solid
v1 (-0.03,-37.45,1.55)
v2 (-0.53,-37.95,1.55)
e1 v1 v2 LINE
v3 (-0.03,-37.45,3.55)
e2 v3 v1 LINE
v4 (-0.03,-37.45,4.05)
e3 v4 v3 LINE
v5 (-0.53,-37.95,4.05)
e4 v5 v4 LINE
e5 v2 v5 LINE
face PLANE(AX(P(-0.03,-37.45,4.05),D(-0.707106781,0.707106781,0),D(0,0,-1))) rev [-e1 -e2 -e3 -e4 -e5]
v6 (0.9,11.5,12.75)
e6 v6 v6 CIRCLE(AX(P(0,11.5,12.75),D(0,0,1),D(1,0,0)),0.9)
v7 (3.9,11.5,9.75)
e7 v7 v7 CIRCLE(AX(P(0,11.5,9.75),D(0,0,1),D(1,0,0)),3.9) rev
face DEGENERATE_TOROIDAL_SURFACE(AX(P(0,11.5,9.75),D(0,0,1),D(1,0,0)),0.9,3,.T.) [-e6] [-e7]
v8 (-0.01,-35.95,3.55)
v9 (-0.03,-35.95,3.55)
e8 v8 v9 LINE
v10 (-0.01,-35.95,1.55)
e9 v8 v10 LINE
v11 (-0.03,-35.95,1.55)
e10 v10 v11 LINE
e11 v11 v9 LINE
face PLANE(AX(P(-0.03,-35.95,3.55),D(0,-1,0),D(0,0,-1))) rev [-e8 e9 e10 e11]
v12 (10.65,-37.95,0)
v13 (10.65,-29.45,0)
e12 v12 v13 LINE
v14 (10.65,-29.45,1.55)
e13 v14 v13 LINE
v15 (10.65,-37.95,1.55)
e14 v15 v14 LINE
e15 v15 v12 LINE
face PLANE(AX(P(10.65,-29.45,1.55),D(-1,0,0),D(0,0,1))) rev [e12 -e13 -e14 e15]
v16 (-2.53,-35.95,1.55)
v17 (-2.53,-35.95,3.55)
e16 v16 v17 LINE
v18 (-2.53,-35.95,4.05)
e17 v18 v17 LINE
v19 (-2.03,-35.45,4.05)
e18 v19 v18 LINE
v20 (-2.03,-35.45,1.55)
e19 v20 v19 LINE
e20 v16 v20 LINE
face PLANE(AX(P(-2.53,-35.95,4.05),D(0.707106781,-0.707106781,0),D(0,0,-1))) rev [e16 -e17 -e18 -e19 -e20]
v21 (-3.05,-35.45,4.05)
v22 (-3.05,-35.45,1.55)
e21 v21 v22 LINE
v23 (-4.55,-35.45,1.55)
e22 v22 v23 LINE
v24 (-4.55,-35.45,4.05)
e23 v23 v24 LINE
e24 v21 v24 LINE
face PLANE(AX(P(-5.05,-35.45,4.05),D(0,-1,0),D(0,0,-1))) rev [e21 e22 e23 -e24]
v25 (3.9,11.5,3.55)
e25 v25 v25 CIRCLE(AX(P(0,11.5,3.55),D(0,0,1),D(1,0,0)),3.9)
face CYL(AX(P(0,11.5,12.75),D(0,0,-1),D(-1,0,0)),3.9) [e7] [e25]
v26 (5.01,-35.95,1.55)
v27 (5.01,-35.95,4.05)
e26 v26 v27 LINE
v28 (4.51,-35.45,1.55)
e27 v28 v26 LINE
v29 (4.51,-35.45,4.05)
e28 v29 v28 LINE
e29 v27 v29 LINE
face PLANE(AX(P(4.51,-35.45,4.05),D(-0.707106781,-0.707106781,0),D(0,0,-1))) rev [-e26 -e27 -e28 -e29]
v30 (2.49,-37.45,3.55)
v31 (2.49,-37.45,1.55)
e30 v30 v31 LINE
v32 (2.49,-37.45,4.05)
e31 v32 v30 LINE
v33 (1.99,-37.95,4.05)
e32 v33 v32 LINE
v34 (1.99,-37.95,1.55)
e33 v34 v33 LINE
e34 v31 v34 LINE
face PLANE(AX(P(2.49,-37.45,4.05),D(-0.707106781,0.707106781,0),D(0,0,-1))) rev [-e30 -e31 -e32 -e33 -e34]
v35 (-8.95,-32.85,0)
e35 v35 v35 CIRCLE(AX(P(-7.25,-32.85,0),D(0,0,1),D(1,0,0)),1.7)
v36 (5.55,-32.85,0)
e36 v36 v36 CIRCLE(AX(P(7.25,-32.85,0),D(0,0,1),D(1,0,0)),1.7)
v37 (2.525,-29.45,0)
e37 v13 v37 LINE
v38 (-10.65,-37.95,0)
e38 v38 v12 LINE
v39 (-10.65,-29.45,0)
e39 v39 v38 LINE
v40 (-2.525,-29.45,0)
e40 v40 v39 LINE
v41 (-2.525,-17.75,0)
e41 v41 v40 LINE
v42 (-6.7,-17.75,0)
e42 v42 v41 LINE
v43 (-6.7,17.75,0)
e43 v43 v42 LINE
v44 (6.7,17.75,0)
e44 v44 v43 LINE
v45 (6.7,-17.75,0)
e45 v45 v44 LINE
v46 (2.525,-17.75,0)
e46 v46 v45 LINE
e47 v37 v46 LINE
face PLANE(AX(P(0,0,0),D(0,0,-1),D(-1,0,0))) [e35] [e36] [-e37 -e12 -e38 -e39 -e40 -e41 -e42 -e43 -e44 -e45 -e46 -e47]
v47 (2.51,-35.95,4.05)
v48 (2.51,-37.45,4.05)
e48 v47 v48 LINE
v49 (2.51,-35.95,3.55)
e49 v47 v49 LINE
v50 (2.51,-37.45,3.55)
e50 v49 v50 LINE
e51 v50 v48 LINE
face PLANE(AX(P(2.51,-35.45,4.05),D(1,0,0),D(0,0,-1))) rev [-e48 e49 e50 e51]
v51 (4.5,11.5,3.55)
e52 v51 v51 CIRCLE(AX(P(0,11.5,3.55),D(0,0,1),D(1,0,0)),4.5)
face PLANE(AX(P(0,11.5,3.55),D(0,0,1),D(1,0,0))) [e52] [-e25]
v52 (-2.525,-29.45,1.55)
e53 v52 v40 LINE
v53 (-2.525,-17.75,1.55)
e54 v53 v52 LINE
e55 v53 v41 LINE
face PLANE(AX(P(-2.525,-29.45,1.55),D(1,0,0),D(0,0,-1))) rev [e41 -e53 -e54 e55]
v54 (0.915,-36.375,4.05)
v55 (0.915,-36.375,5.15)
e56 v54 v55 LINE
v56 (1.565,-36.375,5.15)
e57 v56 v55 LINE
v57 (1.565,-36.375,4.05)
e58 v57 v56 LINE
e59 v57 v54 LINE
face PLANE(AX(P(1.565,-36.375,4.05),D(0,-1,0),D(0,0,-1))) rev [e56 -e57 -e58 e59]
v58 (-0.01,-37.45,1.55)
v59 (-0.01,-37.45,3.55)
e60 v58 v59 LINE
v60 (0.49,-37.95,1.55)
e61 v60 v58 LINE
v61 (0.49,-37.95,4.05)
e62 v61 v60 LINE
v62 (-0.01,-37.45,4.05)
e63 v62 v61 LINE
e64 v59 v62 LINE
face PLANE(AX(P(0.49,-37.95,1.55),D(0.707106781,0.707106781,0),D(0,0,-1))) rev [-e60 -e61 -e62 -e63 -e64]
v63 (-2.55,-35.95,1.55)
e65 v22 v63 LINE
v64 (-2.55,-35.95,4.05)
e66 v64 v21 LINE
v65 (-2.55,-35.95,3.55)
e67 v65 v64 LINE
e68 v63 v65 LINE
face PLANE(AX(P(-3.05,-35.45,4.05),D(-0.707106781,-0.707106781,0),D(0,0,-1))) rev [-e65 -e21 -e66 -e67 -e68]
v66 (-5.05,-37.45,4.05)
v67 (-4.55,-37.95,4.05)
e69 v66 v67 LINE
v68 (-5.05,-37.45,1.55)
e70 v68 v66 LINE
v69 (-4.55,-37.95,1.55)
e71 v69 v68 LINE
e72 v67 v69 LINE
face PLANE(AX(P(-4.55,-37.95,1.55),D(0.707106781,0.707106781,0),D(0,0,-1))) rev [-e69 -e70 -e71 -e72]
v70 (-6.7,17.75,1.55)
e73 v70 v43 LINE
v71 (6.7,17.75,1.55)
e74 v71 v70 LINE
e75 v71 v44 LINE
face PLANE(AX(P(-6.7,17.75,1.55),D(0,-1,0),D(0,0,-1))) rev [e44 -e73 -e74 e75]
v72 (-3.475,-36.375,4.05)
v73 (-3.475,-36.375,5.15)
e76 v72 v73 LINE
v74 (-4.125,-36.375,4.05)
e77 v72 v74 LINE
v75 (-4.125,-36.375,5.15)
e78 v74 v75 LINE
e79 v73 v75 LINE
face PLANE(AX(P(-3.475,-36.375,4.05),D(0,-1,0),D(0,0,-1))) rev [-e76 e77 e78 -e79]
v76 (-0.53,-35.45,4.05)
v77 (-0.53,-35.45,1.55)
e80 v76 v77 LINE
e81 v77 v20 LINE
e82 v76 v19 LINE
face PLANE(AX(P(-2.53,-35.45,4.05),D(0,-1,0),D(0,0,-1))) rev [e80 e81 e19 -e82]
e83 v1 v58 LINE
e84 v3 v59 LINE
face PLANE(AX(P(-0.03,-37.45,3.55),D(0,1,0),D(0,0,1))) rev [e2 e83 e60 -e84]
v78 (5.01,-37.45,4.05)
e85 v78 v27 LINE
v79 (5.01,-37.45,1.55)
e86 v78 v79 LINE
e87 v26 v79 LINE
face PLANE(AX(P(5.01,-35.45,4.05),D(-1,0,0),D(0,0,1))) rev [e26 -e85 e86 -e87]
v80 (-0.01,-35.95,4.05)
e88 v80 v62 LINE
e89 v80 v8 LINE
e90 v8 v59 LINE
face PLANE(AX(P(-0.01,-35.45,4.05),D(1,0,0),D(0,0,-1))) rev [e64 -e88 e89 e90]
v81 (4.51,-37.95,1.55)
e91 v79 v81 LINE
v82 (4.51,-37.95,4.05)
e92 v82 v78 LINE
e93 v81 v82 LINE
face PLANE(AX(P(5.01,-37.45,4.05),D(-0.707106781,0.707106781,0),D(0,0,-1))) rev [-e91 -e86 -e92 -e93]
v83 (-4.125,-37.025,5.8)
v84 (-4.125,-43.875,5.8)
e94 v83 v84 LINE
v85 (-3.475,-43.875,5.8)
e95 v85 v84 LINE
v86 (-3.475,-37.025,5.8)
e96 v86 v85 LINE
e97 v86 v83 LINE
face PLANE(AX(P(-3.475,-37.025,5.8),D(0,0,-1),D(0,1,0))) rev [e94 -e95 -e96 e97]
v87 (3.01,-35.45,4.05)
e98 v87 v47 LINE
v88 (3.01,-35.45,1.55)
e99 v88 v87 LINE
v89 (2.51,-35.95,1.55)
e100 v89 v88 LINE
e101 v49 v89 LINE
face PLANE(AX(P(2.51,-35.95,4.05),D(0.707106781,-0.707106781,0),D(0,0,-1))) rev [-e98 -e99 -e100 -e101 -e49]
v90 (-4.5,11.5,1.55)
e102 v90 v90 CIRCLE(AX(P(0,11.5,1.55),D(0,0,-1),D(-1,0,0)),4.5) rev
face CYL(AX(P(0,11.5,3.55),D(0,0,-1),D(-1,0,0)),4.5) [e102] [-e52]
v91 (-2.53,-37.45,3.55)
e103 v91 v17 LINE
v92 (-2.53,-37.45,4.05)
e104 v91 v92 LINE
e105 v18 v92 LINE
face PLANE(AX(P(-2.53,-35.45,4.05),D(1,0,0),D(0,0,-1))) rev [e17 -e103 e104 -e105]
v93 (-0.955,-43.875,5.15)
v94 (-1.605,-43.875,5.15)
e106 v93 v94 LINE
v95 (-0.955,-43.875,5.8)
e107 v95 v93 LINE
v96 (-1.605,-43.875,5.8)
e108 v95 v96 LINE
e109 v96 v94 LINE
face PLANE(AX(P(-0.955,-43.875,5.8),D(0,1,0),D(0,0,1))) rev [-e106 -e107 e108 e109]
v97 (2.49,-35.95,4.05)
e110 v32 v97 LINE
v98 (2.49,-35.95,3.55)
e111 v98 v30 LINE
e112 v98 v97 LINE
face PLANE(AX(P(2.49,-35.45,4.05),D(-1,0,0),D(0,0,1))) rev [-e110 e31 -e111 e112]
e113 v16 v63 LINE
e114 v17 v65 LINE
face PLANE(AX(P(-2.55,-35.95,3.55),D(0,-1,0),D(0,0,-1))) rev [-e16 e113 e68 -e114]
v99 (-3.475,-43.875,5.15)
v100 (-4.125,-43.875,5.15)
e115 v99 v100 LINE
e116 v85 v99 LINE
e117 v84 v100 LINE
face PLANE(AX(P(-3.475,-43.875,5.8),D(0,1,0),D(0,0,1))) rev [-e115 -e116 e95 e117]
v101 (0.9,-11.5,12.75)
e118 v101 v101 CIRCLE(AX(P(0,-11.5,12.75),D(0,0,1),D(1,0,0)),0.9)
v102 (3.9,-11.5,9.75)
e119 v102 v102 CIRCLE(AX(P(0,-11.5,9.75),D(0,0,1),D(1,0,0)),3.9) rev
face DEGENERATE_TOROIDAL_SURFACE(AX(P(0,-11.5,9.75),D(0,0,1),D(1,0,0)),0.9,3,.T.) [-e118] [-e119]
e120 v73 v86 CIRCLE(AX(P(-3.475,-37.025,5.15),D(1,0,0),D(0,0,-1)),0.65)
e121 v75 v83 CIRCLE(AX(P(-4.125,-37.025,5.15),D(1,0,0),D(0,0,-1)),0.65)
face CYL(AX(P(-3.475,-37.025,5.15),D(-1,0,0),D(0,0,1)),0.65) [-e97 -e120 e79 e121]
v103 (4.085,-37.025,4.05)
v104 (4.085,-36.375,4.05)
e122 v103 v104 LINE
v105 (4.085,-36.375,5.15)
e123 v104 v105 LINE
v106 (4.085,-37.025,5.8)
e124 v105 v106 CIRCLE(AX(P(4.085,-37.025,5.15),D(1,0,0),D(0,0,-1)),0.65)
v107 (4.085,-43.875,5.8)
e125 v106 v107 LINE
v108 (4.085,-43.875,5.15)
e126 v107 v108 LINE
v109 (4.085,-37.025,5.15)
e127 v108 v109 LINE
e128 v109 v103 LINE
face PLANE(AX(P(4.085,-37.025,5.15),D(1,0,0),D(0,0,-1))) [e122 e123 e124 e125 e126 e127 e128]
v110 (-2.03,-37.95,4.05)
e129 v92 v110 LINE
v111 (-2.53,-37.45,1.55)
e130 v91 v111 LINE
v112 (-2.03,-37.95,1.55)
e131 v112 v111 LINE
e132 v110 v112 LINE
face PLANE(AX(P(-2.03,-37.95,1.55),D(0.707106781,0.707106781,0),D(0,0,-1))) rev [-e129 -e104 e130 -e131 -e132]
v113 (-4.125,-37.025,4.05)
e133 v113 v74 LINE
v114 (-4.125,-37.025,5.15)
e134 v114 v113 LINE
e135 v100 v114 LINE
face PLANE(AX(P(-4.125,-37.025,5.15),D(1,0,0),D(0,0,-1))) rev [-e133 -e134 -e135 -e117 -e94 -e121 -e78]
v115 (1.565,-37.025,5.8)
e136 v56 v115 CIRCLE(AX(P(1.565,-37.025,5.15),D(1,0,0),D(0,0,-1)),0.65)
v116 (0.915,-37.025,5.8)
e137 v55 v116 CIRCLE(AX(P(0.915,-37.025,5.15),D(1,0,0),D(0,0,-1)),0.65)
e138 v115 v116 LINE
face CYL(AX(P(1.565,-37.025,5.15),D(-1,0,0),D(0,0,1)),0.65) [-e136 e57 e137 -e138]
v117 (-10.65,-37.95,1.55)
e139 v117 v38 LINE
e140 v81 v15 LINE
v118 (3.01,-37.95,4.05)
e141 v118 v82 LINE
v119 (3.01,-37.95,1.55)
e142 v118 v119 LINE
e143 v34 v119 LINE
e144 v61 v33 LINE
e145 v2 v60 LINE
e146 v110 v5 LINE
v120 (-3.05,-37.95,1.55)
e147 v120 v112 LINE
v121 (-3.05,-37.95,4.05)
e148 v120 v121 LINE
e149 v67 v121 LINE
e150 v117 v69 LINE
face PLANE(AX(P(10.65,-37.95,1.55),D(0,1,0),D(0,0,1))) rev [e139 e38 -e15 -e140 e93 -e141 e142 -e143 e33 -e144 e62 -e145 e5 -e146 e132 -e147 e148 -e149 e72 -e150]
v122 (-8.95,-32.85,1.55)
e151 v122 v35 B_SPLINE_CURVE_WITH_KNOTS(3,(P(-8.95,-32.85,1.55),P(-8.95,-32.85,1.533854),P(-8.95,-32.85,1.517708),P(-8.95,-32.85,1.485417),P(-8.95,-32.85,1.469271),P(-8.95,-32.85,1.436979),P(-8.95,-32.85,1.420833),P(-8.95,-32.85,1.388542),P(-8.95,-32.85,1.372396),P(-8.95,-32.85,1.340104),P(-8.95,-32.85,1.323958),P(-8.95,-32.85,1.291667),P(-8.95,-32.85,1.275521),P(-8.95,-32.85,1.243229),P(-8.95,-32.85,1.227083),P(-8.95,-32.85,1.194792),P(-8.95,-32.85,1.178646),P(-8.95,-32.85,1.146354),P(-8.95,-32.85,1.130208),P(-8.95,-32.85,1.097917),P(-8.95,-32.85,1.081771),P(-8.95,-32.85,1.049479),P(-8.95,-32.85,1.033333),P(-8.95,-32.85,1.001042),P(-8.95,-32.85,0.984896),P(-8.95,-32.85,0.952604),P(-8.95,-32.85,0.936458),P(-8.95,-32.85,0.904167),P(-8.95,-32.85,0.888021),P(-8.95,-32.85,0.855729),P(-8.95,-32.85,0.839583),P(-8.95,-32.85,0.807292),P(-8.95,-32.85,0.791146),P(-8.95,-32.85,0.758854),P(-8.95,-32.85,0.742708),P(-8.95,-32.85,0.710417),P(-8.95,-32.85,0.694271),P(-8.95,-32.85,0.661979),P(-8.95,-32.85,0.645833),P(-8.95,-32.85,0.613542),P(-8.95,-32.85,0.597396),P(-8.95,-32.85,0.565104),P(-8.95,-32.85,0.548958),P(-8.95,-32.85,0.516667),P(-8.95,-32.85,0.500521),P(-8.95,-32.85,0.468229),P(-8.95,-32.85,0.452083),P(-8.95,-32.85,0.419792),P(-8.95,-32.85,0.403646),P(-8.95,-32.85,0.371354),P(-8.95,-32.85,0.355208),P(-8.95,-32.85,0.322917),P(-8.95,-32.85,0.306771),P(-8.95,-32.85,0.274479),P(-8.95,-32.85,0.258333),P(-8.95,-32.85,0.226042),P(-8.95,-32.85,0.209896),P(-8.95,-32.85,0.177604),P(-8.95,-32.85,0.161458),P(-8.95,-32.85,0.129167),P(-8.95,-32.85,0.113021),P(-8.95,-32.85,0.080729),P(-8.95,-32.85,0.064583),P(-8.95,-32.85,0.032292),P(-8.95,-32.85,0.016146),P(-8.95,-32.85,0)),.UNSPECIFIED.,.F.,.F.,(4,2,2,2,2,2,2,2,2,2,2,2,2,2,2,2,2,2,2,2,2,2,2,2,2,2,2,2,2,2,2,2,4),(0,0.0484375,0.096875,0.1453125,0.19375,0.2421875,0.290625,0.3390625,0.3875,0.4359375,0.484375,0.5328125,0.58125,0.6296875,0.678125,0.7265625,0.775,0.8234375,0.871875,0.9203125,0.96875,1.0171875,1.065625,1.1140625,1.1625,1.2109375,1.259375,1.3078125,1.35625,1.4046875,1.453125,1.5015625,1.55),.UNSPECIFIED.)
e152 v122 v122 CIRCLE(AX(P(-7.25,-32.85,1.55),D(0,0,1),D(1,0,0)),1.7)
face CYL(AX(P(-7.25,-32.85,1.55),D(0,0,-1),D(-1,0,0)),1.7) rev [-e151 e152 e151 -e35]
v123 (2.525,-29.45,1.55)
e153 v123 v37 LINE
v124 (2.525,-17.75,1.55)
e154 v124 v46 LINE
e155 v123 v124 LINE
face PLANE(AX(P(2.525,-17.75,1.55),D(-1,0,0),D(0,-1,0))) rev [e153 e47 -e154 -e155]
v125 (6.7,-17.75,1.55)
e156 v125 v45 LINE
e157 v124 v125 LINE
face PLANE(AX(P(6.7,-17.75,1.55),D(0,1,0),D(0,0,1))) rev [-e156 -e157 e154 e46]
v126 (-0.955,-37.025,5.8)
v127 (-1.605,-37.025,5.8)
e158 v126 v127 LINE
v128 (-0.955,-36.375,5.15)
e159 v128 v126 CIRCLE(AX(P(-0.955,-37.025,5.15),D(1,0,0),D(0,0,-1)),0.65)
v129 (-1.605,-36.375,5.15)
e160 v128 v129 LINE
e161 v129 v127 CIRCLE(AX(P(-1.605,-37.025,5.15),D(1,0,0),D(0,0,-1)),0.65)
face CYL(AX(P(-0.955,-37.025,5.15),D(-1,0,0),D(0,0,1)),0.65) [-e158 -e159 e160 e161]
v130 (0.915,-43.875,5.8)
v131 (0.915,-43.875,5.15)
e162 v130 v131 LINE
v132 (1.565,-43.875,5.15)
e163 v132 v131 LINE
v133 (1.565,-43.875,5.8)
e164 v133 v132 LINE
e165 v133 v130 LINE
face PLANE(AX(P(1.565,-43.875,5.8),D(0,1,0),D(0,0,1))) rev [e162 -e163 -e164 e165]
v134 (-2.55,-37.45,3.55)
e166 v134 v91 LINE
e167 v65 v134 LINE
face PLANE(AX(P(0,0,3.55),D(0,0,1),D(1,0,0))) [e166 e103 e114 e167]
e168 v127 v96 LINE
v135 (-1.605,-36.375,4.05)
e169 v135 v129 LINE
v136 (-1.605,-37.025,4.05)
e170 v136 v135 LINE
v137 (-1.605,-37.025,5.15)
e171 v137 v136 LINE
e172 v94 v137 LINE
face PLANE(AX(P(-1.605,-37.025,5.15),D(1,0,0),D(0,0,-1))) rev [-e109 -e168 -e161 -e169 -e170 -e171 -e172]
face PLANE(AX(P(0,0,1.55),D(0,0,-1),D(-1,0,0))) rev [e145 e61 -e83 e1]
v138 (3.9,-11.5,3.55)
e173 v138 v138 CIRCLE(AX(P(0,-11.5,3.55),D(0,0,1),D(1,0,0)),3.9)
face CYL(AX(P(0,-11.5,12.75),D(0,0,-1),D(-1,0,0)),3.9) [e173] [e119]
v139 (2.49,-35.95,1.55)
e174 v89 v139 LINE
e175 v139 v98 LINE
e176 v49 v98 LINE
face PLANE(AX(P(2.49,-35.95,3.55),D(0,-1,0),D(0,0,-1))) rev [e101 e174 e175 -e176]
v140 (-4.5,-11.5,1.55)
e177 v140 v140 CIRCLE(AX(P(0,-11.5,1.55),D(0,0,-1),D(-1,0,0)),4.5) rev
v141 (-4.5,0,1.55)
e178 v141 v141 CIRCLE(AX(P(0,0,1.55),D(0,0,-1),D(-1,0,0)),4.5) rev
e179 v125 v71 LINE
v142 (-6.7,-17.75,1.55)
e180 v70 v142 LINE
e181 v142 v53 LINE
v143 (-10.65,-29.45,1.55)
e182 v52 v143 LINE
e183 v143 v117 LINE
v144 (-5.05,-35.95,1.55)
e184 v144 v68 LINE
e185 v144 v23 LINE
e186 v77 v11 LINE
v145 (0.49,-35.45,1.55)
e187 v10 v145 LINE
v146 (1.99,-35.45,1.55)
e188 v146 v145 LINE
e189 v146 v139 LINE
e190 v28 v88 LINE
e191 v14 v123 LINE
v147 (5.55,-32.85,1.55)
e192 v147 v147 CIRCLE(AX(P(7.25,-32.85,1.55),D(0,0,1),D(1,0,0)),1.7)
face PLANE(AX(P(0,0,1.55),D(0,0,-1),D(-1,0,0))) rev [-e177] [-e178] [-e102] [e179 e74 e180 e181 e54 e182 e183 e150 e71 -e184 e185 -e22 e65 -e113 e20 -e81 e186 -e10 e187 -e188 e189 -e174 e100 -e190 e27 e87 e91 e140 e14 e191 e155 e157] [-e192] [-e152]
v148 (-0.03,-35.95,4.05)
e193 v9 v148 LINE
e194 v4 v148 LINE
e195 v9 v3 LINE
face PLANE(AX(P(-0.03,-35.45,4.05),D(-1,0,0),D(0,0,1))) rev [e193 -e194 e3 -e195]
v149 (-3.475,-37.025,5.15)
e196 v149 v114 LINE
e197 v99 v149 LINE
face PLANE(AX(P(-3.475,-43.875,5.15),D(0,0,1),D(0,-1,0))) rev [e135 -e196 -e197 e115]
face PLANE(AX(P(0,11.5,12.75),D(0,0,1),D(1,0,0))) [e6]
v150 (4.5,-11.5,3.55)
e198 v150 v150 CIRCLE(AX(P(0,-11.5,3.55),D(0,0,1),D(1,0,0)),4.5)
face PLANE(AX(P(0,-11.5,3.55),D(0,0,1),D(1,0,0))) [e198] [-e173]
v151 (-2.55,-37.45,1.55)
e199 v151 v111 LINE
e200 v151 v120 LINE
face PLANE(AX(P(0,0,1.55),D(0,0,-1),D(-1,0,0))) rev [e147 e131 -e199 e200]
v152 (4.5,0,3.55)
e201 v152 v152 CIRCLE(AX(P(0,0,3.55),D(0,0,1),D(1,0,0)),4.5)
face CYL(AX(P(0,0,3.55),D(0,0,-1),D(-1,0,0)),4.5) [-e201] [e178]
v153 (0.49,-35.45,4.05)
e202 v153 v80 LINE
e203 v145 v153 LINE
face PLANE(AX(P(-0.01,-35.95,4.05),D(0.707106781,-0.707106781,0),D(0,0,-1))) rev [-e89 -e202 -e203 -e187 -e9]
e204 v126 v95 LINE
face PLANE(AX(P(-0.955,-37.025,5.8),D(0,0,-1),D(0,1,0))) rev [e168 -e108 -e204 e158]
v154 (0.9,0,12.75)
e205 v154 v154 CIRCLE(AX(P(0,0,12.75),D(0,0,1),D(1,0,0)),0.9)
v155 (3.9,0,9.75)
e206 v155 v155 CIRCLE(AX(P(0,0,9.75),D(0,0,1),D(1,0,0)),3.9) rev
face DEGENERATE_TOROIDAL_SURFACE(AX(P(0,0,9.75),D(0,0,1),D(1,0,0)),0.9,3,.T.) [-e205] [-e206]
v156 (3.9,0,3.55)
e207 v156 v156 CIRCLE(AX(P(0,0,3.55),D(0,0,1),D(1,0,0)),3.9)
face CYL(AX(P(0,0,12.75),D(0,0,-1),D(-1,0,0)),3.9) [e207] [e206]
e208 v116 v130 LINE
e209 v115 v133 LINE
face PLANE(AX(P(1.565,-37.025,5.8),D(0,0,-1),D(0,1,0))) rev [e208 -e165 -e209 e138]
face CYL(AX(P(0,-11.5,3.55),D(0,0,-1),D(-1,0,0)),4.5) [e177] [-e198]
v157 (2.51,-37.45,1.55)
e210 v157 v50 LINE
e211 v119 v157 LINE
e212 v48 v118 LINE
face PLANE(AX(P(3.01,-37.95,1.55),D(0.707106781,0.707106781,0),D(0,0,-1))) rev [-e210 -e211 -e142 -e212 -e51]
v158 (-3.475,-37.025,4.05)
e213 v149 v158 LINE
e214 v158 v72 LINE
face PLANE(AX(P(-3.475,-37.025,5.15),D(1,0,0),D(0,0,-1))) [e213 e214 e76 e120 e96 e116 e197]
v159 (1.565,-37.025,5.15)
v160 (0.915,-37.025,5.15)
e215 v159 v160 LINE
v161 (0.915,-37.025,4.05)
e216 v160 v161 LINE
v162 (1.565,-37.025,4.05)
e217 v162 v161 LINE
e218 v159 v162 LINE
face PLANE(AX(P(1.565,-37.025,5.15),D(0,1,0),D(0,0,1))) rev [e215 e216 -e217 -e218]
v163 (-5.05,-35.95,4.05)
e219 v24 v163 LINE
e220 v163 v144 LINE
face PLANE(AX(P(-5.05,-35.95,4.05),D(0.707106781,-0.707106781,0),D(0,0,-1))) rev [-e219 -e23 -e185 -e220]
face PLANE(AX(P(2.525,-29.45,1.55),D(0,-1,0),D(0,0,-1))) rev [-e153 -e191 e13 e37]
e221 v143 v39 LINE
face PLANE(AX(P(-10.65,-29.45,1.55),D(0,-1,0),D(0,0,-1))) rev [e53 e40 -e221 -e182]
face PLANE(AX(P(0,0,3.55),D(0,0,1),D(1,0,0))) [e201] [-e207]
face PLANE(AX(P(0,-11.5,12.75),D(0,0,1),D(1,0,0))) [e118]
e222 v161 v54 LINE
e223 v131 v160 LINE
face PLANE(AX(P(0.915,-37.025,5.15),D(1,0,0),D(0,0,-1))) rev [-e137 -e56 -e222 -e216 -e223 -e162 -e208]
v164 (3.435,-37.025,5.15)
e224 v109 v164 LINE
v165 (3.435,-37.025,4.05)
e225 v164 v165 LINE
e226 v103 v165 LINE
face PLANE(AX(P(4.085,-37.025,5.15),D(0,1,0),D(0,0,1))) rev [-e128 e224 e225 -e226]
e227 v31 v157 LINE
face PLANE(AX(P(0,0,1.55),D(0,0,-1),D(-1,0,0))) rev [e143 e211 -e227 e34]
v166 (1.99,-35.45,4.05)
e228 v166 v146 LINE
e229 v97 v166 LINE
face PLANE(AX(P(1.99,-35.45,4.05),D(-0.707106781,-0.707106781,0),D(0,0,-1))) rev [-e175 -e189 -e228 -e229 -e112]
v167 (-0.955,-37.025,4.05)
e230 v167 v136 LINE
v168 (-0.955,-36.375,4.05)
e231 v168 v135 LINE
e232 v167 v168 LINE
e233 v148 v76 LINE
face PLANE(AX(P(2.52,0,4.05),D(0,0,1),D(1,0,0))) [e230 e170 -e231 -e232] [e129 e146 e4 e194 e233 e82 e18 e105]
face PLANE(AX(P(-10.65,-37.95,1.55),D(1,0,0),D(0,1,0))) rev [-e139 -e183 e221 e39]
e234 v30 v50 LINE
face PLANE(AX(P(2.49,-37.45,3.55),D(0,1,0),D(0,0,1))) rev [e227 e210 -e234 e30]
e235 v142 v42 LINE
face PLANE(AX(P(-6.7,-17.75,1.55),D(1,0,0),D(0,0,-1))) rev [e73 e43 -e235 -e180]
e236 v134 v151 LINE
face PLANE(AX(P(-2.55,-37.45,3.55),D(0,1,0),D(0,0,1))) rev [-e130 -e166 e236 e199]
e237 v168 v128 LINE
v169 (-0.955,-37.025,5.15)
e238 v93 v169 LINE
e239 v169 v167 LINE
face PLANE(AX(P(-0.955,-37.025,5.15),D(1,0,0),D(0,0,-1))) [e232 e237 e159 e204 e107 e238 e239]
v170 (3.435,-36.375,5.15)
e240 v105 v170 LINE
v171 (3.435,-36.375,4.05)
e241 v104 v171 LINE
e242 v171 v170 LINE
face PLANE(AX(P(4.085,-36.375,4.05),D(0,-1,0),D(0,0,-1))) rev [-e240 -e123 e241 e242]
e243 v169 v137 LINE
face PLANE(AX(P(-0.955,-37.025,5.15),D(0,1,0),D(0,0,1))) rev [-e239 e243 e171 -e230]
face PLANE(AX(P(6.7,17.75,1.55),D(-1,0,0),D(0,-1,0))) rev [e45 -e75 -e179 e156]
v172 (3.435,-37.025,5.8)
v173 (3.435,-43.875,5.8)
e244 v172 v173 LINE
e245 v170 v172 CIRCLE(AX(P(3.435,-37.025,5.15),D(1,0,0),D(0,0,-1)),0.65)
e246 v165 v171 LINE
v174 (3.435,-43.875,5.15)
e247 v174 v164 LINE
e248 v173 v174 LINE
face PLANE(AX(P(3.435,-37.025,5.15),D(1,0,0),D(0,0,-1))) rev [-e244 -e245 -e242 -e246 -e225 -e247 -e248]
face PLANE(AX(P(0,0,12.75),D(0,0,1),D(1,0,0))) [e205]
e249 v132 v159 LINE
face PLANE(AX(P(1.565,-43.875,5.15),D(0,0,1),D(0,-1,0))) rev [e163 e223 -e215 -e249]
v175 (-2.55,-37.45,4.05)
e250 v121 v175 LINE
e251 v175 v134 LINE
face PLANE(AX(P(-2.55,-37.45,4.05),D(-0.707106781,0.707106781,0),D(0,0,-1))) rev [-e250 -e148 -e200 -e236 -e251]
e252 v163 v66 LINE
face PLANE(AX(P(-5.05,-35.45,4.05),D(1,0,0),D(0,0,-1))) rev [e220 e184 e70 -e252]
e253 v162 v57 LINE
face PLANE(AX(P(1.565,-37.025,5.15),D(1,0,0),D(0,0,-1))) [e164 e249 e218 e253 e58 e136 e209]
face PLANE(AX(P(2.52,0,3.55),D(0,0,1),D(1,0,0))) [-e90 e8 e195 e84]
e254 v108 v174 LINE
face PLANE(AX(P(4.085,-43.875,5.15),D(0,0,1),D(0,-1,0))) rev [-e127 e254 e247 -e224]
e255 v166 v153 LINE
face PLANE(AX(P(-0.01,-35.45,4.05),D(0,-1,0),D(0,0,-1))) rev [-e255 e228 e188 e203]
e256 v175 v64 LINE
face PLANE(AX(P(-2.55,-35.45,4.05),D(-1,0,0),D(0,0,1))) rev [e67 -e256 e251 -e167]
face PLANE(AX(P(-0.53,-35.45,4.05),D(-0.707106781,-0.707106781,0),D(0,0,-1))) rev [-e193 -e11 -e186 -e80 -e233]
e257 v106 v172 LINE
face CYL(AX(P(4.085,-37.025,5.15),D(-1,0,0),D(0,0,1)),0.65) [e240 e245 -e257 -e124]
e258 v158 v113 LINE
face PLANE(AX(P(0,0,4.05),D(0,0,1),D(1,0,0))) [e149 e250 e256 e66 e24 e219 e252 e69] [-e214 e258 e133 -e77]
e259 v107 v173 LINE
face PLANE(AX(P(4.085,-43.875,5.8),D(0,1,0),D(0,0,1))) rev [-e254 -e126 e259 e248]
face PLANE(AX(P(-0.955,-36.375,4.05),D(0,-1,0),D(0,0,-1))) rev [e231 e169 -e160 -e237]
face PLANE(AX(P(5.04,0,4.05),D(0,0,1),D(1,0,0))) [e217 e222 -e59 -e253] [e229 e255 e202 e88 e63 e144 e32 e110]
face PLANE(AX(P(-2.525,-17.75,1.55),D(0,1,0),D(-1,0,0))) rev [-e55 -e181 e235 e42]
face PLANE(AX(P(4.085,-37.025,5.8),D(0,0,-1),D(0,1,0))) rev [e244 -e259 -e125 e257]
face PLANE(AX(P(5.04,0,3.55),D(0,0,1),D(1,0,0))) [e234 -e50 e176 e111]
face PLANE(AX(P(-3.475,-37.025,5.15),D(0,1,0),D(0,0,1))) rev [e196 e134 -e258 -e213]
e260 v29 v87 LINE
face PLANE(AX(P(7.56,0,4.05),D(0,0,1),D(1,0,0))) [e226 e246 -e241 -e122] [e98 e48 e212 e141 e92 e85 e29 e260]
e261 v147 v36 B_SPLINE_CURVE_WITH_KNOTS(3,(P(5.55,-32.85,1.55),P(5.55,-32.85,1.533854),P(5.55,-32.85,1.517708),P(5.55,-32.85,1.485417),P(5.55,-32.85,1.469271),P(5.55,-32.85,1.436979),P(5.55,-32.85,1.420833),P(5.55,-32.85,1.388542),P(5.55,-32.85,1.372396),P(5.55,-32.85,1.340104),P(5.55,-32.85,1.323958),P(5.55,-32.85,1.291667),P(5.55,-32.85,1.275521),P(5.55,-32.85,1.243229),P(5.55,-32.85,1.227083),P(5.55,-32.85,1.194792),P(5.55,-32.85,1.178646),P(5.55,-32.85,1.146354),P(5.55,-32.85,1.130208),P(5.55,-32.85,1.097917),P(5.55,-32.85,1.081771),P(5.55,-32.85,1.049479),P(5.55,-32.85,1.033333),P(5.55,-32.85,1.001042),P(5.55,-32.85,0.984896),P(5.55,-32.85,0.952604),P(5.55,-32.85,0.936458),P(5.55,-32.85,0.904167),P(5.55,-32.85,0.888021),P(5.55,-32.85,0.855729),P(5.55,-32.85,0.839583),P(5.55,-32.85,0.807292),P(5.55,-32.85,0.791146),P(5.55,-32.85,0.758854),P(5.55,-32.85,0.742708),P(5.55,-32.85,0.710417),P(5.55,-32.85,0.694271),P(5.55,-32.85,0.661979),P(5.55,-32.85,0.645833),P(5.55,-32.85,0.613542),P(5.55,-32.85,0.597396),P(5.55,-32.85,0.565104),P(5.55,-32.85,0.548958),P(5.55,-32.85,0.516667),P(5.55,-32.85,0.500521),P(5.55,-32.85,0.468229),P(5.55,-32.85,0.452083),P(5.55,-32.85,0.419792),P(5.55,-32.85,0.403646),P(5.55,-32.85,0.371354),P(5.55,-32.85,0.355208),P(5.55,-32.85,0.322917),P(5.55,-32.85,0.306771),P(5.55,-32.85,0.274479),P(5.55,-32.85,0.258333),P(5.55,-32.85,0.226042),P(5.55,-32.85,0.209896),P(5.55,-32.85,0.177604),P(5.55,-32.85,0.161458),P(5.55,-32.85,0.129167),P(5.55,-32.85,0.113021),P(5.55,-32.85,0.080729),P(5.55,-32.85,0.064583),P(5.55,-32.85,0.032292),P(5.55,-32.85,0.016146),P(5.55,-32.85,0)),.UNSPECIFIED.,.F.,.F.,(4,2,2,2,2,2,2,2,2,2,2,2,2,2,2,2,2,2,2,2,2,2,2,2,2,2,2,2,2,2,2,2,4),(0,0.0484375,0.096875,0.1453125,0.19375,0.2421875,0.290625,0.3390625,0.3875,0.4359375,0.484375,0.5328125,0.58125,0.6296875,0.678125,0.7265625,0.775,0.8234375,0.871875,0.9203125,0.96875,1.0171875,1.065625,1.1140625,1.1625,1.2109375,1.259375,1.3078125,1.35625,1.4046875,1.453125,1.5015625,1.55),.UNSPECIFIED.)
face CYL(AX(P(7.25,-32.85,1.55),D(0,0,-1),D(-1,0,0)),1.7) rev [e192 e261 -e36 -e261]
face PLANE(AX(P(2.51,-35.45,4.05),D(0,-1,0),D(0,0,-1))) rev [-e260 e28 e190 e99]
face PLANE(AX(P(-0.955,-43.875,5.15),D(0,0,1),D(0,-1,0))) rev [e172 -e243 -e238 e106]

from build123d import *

# Parameters (mm, degrees)
SKETCH1_R               = 1.7
BOSS_EXTRUDE1_DEPTH     = 1.55
SKETCH2_R               = 4.5
BOSS_EXTRUDE2_DEPTH     = 2
SKETCH3_R               = 3.9
BOSS_EXTRUDE3_DEPTH     = 9.2
FILLET1_R               = 3
SKETCH4_W               = 2.5
SKETCH4_H               = 2.5
BOSS_EXTRUDE5_DEPTH     = 2.5
CHAMFER1_SIZE           = 0.5
SKETCH5_W               = 0.25
SKETCH5_H               = 1.5
BOSS_EXTRUDE6_DEPTH     = 2
BOSS_EXTRUDE7_START     = -3.8
BOSS_EXTRUDE7_DEPTH     = 0.325
LPATTERN1_START         = 1.55
LPATTERN1_DEPTH         = 2.5
LPATTERN1_START_2       = 5.15
LPATTERN1_2_OUTLINE_W   = 0.65
LPATTERN1_2_OUTLINE_H   = 6.85
LPATTERN1_2_DEPTH       = 0.65
LPATTERN1_START_3       = 4.05
LPATTERN1_3_OUTLINE_W   = 0.65
LPATTERN1_3_OUTLINE_H   = 0.65
LPATTERN1_3_DEPTH       = 1.1
LPATTERN1_4_OUTLINE_W   = 0.02
LPATTERN1_4_OUTLINE_H   = 1.5
LPATTERN1_4_OUTLINE_W_2 = 0.25
LPATTERN1_4_DEPTH       = 2
LPATTERN1_START_4       = -1.605
LPATTERN1_5_DEPTH       = 0.65
LPATTERN1_START_5       = 0.915
LPATTERN1_6_DEPTH       = 0.65
LPATTERN1_START_6       = 3.435
LPATTERN1_7_DEPTH       = 0.65
DELETEFACE1_START       = 5.01
DELETEFACE1_OUTLINE_W   = 1.5
DELETEFACE1_OUTLINE_H   = 2
DELETEFACE1_DEPTH       = 0.25


with BuildPart() as part:
    # Sketch1 → Boss-Extrude1 (new body)
    with BuildSketch(Plane.XY):
        Polygon((-6.7, 17.75), (6.7, 17.75), (6.7, -17.75), (2.525, -17.75), (2.525, -29.45), (10.65, -29.45), (10.65, -37.95), (-10.65, -37.95), (-10.65, -29.45), (-2.525, -29.45), (-2.525, -17.75), (-6.7, -17.75), align=None)
        with Locations(Location((-7.25, -32.85, 0), (0, 0, 180))):
            Circle(SKETCH1_R, mode=Mode.SUBTRACT)
        with Locations(Location((7.25, -32.85, 0), (0, 0, 180))):
            Circle(SKETCH1_R, mode=Mode.SUBTRACT)
    extrude(amount=BOSS_EXTRUDE1_DEPTH)

    # Sketch2 → Boss-Extrude2 (add)
    with BuildSketch(Plane.XY.offset(1.55)):
        with Locations(Location((0, 11.5, 0), (0, 0, 180))):
            Circle(SKETCH2_R)
        with Locations(Location((0, 0, 0), (0, 0, 180))):
            Circle(SKETCH2_R)
        with Locations(Location((0, -11.5, 0), (0, 0, 180))):
            Circle(SKETCH2_R)
    extrude(amount=BOSS_EXTRUDE2_DEPTH)

    # Sketch3 → Boss-Extrude3 (add)
    with BuildSketch(Plane.XY.offset(3.55)):
        Circle(SKETCH3_R)
        with Locations((0, 11.5)):
            Circle(SKETCH3_R)
        with Locations((0, -11.5)):
            Circle(SKETCH3_R)
    extrude(amount=BOSS_EXTRUDE3_DEPTH)

    # Fillet1
    fillet1_edges = [part.edges().sort_by_distance(p)[0] for p in [
        (-3.9, 0, 12.75),
        (-3.9, 11.5, 12.75),
        (-3.9, -11.5, 12.75),
    ]]
    fillet(fillet1_edges, radius=FILLET1_R)

    # Sketch4 → Boss-Extrude5 (add)
    with BuildSketch(Plane.XY.offset(1.55)):
        with Locations((-3.8, -36.7)):
            Rectangle(SKETCH4_W, SKETCH4_H)
    extrude(amount=BOSS_EXTRUDE5_DEPTH)

    # Chamfer1
    chamfer1_edges = [part.edges().sort_by_distance(p)[0] for p in [
        (-2.55, -37.95, 2.8),
        (-2.55, -35.45, 2.8),
        (-5.05, -35.45, 2.8),
        (-5.05, -37.95, 2.8),
    ]]
    chamfer(chamfer1_edges, length=CHAMFER1_SIZE)

    # Sketch5 → Boss-Extrude6 (add)
    with BuildSketch(Plane.XY.offset(1.55)):
        with Locations((-2.425, -36.7)):
            Rectangle(SKETCH5_W, SKETCH5_H)
    extrude(amount=BOSS_EXTRUDE6_DEPTH)

    # Sketch6 → Boss-Extrude7 (add, symmetric)
    with BuildSketch(Plane(origin=(0, 0, 0), x_dir=(0, 0, -1), z_dir=(1, 0, 0)).offset(BOSS_EXTRUDE7_START)):
        with BuildLine():
            Line((-4.05, -36.375), (-5.15, -36.375))
            ThreePointArc((-5.15, -36.375), (-5.609619408, -36.565380592), (-5.8, -37.025))
            Line((-5.8, -37.025), (-5.8, -43.875))
            Line((-5.8, -43.875), (-5.15, -43.875))
            Line((-5.15, -43.875), (-5.15, -37.025))
            Line((-5.15, -37.025), (-4.05, -37.025))
            Line((-4.05, -37.025), (-4.05, -36.375))
        make_face()
    extrude(amount=BOSS_EXTRUDE7_DEPTH, both=True)

    # LPattern1: read off the stored shape, not the designer's step
    # LPattern1 outline → LPattern1 (add)
    with BuildSketch(Plane.XY.offset(LPATTERN1_START)):
        Polygon((-0.01, -35.95), (-0.01, -37.45), (0.49, -37.95), (1.99, -37.95), (2.49, -37.45), (2.49, -35.95), (1.99, -35.45), (0.49, -35.45), align=None)
        Polygon((-0.53, -37.95), (-0.03, -37.45), (-0.03, -35.95), (-0.53, -35.45), (-2.03, -35.45), (-2.53, -35.95), (-2.53, -37.45), (-2.03, -37.95), align=None)
        Polygon((3.01, -35.45), (2.51, -35.95), (2.51, -37.45), (3.01, -37.95), (4.51, -37.95), (5.01, -37.45), (5.01, -35.95), (4.51, -35.45), align=None)
    extrude(amount=LPATTERN1_DEPTH)



with BuildPart() as body_2:
    # LPattern1 2 outline → LPattern1 2 (new body)
    with BuildSketch(Plane.XY.offset(LPATTERN1_START_2)):
        with Locations((1.24, -40.45)):
            Rectangle(LPATTERN1_2_OUTLINE_W, LPATTERN1_2_OUTLINE_H)
        with Locations((-1.28, -40.45)):
            Rectangle(LPATTERN1_2_OUTLINE_W, LPATTERN1_2_OUTLINE_H)
        with Locations((3.76, -40.45)):
            Rectangle(LPATTERN1_2_OUTLINE_W, LPATTERN1_2_OUTLINE_H)
    extrude(amount=LPATTERN1_2_DEPTH)


with BuildPart() as part_1:
    add(part.part)

    add(body_2.part)  # LPattern1 3 merges body 2
    # LPattern1 3 outline → LPattern1 3 (add)
    with BuildSketch(Plane.XY.offset(LPATTERN1_START_3)):
        with Locations((1.24, -36.7)):
            Rectangle(LPATTERN1_3_OUTLINE_W, LPATTERN1_3_OUTLINE_H)
        with Locations((-1.28, -36.7)):
            Rectangle(LPATTERN1_3_OUTLINE_W, LPATTERN1_3_OUTLINE_H)
        with Locations((3.76, -36.7)):
            Rectangle(LPATTERN1_3_OUTLINE_W, LPATTERN1_3_OUTLINE_H)
    extrude(amount=LPATTERN1_3_DEPTH)

    # LPattern1 4 outline → LPattern1 4 (add)
    with BuildSketch(Plane.XY.offset(LPATTERN1_START)):
        with Locations((-0.02, -36.7)):
            Rectangle(LPATTERN1_4_OUTLINE_W, LPATTERN1_4_OUTLINE_H)
        with Locations((2.5, -36.7)):
            Rectangle(LPATTERN1_4_OUTLINE_W, LPATTERN1_4_OUTLINE_H)
        with Locations((5.135, -36.7)):
            Rectangle(LPATTERN1_4_OUTLINE_W_2, LPATTERN1_4_OUTLINE_H)
    extrude(amount=LPATTERN1_4_DEPTH)

    # LPattern1 5 outline → LPattern1 5 (add)
    with BuildSketch(Plane.YZ.offset(LPATTERN1_START_4)):
        with BuildLine():
            ThreePointArc((-36.375, 5.15), (-36.565380592, 5.609619408), (-37.025, 5.8))
            Line((-37.025, 5.8), (-37.025, 5.15))
            Line((-37.025, 5.15), (-36.375, 5.15))
        make_face()
    extrude(amount=LPATTERN1_5_DEPTH)

    # LPattern1 6 outline → LPattern1 6 (add)
    with BuildSketch(Plane.YZ.offset(LPATTERN1_START_5)):
        with BuildLine():
            ThreePointArc((-36.375, 5.15), (-36.565380592, 5.609619408), (-37.025, 5.8))
            Line((-37.025, 5.8), (-37.025, 5.15))
            Line((-37.025, 5.15), (-36.375, 5.15))
        make_face()
    extrude(amount=LPATTERN1_6_DEPTH)

    # LPattern1 7 outline → LPattern1 7 (add)
    with BuildSketch(Plane.YZ.offset(LPATTERN1_START_6)):
        with BuildLine():
            ThreePointArc((-36.375, 5.15), (-36.565380592, 5.609619408), (-37.025, 5.8))
            Line((-37.025, 5.8), (-37.025, 5.15))
            Line((-37.025, 5.15), (-36.375, 5.15))
        make_face()
    extrude(amount=LPATTERN1_7_DEPTH)

    # DeleteFace1: read off the stored shape, not the designer's step
    # DeleteFace1 outline → DeleteFace1 (cut)
    with BuildSketch(Plane.YZ.offset(DELETEFACE1_START)):
        with Locations((-36.7, 2.55)):
            Rectangle(DELETEFACE1_OUTLINE_W, DELETEFACE1_OUTLINE_H)
    extrude(amount=DELETEFACE1_DEPTH, mode=Mode.SUBTRACT)


solid = part_1.part
